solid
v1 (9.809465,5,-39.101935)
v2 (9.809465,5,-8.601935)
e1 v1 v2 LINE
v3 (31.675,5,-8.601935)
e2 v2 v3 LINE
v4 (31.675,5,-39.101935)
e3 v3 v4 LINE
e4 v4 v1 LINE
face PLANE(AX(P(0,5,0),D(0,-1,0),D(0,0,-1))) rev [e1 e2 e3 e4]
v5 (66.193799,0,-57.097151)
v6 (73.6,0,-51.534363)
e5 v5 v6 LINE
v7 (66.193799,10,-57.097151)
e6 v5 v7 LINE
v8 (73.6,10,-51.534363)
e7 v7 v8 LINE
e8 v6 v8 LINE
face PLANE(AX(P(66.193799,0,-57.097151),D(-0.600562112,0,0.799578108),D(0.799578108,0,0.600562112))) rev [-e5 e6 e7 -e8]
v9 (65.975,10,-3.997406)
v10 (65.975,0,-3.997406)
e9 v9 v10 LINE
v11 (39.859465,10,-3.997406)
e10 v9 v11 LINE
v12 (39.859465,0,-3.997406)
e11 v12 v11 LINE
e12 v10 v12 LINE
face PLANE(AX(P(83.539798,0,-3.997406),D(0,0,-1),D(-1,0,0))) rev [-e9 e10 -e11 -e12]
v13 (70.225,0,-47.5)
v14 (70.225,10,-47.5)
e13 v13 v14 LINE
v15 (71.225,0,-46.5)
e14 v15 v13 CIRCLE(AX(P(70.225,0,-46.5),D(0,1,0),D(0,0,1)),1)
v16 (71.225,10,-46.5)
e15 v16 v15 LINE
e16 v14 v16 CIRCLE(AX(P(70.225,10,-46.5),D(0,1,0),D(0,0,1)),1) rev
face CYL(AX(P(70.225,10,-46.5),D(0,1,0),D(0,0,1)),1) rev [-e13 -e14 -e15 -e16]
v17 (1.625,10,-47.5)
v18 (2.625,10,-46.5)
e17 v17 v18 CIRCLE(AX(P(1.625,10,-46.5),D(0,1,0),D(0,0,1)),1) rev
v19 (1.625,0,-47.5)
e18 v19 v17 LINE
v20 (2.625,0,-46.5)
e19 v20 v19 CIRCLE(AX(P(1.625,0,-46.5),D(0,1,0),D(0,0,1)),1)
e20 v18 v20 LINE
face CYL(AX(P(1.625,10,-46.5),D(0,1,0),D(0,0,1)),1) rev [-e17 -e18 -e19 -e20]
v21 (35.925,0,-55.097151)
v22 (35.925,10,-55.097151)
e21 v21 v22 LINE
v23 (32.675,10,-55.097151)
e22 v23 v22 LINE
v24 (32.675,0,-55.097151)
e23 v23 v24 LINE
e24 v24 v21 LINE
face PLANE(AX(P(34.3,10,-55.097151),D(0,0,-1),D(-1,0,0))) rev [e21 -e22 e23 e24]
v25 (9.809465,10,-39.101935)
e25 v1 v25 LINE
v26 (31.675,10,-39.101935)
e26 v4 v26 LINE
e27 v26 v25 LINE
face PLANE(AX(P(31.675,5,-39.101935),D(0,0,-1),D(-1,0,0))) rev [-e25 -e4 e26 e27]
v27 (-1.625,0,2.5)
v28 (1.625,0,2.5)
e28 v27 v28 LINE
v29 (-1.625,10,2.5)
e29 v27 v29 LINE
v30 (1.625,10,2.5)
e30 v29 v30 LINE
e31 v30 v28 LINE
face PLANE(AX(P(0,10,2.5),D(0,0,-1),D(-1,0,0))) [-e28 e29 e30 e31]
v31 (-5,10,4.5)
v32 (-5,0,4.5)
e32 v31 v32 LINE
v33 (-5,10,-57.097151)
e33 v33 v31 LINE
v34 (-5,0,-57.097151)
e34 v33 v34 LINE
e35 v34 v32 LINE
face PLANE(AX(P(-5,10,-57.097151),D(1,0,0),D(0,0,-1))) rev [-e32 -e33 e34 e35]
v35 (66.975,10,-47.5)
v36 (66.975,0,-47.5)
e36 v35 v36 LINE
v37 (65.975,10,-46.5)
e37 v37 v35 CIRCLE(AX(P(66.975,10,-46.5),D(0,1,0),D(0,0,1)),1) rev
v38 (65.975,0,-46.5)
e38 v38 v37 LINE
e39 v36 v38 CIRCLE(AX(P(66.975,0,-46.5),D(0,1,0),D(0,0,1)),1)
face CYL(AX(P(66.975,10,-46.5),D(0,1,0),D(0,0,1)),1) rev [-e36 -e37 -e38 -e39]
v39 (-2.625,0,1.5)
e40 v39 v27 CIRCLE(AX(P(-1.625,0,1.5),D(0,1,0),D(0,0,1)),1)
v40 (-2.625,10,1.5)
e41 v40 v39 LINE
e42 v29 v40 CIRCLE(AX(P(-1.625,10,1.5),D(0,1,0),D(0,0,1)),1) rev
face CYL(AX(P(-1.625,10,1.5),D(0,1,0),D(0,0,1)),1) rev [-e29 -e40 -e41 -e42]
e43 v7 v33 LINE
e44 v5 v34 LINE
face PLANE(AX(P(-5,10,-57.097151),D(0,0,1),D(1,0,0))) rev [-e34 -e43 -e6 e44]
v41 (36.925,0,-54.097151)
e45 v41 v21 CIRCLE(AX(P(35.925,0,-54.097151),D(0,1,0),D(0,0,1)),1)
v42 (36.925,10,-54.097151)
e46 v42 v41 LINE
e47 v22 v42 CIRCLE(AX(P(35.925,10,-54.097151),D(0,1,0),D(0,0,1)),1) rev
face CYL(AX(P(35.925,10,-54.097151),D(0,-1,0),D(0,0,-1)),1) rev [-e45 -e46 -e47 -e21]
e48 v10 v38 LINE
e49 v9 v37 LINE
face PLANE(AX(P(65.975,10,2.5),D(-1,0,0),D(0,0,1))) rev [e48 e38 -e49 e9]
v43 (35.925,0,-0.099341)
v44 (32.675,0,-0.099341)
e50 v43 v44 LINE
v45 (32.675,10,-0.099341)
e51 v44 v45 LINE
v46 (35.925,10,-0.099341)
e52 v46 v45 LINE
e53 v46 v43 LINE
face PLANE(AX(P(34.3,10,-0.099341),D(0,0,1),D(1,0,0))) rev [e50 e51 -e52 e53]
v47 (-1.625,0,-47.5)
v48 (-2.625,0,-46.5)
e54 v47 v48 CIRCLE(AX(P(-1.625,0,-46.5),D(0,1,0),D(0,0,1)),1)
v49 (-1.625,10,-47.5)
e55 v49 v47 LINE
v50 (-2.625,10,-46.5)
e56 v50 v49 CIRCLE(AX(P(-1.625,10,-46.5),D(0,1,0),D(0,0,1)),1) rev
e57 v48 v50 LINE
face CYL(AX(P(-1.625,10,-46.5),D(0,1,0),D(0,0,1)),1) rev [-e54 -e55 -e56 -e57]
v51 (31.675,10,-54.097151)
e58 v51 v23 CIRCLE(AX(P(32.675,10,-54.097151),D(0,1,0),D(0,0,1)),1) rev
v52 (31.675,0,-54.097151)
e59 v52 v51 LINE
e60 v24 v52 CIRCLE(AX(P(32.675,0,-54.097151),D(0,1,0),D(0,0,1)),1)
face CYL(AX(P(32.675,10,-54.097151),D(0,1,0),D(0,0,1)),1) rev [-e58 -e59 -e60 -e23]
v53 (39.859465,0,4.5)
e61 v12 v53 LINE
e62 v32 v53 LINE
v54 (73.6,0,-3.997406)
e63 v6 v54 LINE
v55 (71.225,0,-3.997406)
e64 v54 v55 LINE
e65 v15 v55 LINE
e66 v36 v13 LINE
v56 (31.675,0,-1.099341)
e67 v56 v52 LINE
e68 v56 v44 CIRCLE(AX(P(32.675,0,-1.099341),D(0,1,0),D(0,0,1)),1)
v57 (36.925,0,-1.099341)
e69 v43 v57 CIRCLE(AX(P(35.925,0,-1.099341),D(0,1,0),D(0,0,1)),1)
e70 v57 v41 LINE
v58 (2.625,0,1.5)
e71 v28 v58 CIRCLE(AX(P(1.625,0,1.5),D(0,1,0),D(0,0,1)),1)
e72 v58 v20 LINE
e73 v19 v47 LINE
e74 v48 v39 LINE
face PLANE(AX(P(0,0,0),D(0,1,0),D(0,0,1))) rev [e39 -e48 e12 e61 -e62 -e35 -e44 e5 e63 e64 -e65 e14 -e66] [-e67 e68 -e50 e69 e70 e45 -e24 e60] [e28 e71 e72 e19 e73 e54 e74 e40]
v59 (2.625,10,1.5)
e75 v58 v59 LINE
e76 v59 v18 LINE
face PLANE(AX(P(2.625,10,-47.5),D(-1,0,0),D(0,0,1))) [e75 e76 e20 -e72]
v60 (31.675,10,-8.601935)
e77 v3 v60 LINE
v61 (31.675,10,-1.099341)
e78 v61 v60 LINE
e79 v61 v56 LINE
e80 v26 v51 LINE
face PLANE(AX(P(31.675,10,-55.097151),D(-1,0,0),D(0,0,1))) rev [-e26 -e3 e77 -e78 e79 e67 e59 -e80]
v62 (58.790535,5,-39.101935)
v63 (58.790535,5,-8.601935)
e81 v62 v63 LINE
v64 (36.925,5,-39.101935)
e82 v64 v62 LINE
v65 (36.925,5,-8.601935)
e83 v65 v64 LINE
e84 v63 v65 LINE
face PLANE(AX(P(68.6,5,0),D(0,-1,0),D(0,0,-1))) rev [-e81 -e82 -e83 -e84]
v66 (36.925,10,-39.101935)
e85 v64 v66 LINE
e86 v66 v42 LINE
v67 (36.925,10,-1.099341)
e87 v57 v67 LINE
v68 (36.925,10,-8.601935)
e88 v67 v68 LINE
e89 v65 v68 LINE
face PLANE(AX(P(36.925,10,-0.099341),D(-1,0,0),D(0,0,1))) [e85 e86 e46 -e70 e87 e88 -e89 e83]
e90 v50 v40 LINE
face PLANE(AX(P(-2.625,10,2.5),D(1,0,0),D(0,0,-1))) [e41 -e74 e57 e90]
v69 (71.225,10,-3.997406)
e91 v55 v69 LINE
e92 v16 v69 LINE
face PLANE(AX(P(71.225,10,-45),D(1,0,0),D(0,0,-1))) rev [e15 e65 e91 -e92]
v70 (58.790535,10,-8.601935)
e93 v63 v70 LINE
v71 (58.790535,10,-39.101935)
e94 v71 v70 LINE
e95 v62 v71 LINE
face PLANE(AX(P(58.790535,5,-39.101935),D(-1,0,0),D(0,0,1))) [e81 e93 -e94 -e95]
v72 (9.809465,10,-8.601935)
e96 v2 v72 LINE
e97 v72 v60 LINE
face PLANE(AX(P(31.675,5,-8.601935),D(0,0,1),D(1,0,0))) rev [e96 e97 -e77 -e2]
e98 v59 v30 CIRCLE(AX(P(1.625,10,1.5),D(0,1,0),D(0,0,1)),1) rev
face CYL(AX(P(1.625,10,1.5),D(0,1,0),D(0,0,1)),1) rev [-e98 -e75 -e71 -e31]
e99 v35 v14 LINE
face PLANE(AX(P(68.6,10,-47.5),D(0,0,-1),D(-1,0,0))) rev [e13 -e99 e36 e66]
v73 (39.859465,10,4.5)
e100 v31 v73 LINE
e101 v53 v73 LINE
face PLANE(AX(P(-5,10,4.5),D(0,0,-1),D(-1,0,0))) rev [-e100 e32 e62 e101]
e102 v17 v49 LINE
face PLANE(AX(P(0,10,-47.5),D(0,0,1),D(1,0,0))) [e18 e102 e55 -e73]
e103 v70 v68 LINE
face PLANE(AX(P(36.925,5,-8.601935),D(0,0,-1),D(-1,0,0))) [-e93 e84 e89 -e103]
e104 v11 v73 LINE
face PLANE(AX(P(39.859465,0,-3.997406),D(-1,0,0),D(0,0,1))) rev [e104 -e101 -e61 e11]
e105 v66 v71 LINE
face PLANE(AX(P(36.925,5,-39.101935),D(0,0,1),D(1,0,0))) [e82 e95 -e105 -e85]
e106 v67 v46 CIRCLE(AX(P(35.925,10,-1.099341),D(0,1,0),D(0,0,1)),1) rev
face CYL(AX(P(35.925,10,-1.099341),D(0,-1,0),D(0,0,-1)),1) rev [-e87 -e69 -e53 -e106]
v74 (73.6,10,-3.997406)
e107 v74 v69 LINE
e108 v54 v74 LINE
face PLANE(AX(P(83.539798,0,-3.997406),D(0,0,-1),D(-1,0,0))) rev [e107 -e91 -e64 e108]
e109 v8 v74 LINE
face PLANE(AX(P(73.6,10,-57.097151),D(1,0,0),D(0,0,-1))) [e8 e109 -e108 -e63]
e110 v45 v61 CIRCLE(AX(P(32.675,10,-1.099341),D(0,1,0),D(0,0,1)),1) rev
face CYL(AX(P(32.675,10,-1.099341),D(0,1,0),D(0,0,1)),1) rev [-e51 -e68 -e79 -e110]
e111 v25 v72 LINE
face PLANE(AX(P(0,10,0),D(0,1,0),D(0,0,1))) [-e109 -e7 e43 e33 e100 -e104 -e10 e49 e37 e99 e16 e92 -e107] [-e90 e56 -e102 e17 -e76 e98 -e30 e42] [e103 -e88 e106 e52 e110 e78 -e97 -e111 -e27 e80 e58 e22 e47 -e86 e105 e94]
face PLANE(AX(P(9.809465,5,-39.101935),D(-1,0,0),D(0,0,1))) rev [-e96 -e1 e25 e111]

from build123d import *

# Parameters (mm, degrees)
BOSS_EXTRUDE1_DEPTH = 10
FILLET1_R           = 1
SKETCH2_W           = 21.86553483
SKETCH2_H           = 30.5
CUT_EXTRUDE1_DEPTH  = 5
MIRROR1_DEPTH       = 10
MIRROR1_2_OUTLINE_W = 21.86553483
MIRROR1_2_OUTLINE_H = 30.5
MIRROR1_2_DEPTH     = 5
SKETCH6_W           = 43.680332617
SKETCH6_H           = 16.249834628
CUT_EXTRUDE2_DEPTH  = 10


# Read off the part's stored shape, not the designer's step: Mirror1
with BuildPart() as part:
    # Sketch1 → Boss-Extrude1 (new body)
    with BuildSketch(Plane(origin=(0, 0, 0), x_dir=(1, 0, 0), z_dir=(0, 1, 0))):
        Polygon((-5, 57.097150921), (34.3, 57.097150921), (34.3, 55.097150921), (31.675, 55.097150921), (31.675, 52.597150921), (31.675, 2.599340873), (31.675, 0.099340873), (34.3, 0.099340873), (34.3, -4.5), (-5, -4.5), align=None)
        Polygon((-2.625, 45), (-2.625, 0), (-2.625, -2.5), (0, -2.5), (2.625, -2.5), (2.625, 0), (2.625, 45), (2.625, 47.5), (0, 47.5), (-2.625, 47.5), align=None, mode=Mode.SUBTRACT)
    extrude(amount=BOSS_EXTRUDE1_DEPTH)

    # Fillet1
    fillet1_edges = [part.edges().sort_by_distance(p)[0] for p in [
        (31.675, 5, -55.097150921),
        (31.675, 5, -0.099340873),
        (-2.625, 5, -47.5),
        (-2.625, 5, 2.5),
        (2.625, 5, 2.5),
        (2.625, 5, -47.5),
    ]]
    fillet(fillet1_edges, radius=FILLET1_R)

    # Sketch2 → Cut-Extrude1 (cut)
    with BuildSketch(Plane(origin=(0, 10, 0), x_dir=(1, 0, 0), z_dir=(0, 1, 0))):
        with Locations((20.742232585, 23.8519351)):
            Rectangle(SKETCH2_W, SKETCH2_H)
    extrude(amount=-CUT_EXTRUDE1_DEPTH, mode=Mode.SUBTRACT)

    # Mirror1 outline → Mirror1 (add)
    with BuildSketch(Plane(origin=(0, 0, 0), x_dir=(1, 0, 0), z_dir=(0, 1, 0))):
        with BuildLine():
            ThreePointArc((35.925, 55.097150921), (36.632106781, 54.804257702), (36.925, 54.097150921))
            Line((36.925, 54.097150921), (36.925, 39.1019351))
            Line((36.925, 39.1019351), (58.79053483, 39.1019351))
            Line((58.79053483, 39.1019351), (58.79053483, 8.6019351))
            Line((58.79053483, 8.6019351), (36.925, 8.6019351))
            Line((36.925, 8.6019351), (36.925, 1.099340873))
            ThreePointArc((36.925, 1.099340873), (36.632106781, 0.392234092), (35.925, 0.099340873))
            Line((35.925, 0.099340873), (34.3, 0.099340873))
            Line((34.3, 0.099340873), (34.3, -4.5))
            Line((34.3, -4.5), (73.6, -4.5))
            Line((73.6, -4.5), (73.6, 57.097150921))
            Line((73.6, 57.097150921), (34.3, 57.097150921))
            Line((34.3, 57.097150921), (34.3, 55.097150921))
            Line((34.3, 55.097150921), (35.925, 55.097150921))
        make_face()
        with BuildLine():
            Line((70.225, -2.5), (66.975, -2.5))
            ThreePointArc((66.975, -2.5), (66.267893219, -2.207106781), (65.975, -1.5))
            Line((65.975, -1.5), (65.975, 46.5))
            ThreePointArc((65.975, 46.5), (66.267893219, 47.207106781), (66.975, 47.5))
            Line((66.975, 47.5), (70.225, 47.5))
            ThreePointArc((70.225, 47.5), (70.932106781, 47.207106781), (71.225, 46.5))
            Line((71.225, 46.5), (71.225, -1.5))
            ThreePointArc((71.225, -1.5), (70.932106781, -2.207106781), (70.225, -2.5))
        make_face(mode=Mode.SUBTRACT)
    extrude(amount=MIRROR1_DEPTH)

    # Mirror1 2 outline → Mirror1 2 (add)
    with BuildSketch(Plane(origin=(0, 0, 0), x_dir=(1, 0, 0), z_dir=(0, 1, 0))):
        with Locations((47.857767415, 23.8519351)):
            Rectangle(MIRROR1_2_OUTLINE_W, MIRROR1_2_OUTLINE_H)
    extrude(amount=MIRROR1_2_DEPTH)

    # Sketch6 → Cut-Extrude2 (cut)
    with BuildSketch(Plane(origin=(0, 10, 0), x_dir=(1, 0, 0), z_dir=(0, 1, 0))):
        with Locations((61.699631479, -4.127511542)):
            Rectangle(SKETCH6_W, SKETCH6_H)
        Polygon((66.193799085, 57.097150921), (73.6, 51.534362723), (73.6, 57.097150921), align=None)
    extrude(amount=-CUT_EXTRUDE2_DEPTH, mode=Mode.SUBTRACT)


solid = part.part
